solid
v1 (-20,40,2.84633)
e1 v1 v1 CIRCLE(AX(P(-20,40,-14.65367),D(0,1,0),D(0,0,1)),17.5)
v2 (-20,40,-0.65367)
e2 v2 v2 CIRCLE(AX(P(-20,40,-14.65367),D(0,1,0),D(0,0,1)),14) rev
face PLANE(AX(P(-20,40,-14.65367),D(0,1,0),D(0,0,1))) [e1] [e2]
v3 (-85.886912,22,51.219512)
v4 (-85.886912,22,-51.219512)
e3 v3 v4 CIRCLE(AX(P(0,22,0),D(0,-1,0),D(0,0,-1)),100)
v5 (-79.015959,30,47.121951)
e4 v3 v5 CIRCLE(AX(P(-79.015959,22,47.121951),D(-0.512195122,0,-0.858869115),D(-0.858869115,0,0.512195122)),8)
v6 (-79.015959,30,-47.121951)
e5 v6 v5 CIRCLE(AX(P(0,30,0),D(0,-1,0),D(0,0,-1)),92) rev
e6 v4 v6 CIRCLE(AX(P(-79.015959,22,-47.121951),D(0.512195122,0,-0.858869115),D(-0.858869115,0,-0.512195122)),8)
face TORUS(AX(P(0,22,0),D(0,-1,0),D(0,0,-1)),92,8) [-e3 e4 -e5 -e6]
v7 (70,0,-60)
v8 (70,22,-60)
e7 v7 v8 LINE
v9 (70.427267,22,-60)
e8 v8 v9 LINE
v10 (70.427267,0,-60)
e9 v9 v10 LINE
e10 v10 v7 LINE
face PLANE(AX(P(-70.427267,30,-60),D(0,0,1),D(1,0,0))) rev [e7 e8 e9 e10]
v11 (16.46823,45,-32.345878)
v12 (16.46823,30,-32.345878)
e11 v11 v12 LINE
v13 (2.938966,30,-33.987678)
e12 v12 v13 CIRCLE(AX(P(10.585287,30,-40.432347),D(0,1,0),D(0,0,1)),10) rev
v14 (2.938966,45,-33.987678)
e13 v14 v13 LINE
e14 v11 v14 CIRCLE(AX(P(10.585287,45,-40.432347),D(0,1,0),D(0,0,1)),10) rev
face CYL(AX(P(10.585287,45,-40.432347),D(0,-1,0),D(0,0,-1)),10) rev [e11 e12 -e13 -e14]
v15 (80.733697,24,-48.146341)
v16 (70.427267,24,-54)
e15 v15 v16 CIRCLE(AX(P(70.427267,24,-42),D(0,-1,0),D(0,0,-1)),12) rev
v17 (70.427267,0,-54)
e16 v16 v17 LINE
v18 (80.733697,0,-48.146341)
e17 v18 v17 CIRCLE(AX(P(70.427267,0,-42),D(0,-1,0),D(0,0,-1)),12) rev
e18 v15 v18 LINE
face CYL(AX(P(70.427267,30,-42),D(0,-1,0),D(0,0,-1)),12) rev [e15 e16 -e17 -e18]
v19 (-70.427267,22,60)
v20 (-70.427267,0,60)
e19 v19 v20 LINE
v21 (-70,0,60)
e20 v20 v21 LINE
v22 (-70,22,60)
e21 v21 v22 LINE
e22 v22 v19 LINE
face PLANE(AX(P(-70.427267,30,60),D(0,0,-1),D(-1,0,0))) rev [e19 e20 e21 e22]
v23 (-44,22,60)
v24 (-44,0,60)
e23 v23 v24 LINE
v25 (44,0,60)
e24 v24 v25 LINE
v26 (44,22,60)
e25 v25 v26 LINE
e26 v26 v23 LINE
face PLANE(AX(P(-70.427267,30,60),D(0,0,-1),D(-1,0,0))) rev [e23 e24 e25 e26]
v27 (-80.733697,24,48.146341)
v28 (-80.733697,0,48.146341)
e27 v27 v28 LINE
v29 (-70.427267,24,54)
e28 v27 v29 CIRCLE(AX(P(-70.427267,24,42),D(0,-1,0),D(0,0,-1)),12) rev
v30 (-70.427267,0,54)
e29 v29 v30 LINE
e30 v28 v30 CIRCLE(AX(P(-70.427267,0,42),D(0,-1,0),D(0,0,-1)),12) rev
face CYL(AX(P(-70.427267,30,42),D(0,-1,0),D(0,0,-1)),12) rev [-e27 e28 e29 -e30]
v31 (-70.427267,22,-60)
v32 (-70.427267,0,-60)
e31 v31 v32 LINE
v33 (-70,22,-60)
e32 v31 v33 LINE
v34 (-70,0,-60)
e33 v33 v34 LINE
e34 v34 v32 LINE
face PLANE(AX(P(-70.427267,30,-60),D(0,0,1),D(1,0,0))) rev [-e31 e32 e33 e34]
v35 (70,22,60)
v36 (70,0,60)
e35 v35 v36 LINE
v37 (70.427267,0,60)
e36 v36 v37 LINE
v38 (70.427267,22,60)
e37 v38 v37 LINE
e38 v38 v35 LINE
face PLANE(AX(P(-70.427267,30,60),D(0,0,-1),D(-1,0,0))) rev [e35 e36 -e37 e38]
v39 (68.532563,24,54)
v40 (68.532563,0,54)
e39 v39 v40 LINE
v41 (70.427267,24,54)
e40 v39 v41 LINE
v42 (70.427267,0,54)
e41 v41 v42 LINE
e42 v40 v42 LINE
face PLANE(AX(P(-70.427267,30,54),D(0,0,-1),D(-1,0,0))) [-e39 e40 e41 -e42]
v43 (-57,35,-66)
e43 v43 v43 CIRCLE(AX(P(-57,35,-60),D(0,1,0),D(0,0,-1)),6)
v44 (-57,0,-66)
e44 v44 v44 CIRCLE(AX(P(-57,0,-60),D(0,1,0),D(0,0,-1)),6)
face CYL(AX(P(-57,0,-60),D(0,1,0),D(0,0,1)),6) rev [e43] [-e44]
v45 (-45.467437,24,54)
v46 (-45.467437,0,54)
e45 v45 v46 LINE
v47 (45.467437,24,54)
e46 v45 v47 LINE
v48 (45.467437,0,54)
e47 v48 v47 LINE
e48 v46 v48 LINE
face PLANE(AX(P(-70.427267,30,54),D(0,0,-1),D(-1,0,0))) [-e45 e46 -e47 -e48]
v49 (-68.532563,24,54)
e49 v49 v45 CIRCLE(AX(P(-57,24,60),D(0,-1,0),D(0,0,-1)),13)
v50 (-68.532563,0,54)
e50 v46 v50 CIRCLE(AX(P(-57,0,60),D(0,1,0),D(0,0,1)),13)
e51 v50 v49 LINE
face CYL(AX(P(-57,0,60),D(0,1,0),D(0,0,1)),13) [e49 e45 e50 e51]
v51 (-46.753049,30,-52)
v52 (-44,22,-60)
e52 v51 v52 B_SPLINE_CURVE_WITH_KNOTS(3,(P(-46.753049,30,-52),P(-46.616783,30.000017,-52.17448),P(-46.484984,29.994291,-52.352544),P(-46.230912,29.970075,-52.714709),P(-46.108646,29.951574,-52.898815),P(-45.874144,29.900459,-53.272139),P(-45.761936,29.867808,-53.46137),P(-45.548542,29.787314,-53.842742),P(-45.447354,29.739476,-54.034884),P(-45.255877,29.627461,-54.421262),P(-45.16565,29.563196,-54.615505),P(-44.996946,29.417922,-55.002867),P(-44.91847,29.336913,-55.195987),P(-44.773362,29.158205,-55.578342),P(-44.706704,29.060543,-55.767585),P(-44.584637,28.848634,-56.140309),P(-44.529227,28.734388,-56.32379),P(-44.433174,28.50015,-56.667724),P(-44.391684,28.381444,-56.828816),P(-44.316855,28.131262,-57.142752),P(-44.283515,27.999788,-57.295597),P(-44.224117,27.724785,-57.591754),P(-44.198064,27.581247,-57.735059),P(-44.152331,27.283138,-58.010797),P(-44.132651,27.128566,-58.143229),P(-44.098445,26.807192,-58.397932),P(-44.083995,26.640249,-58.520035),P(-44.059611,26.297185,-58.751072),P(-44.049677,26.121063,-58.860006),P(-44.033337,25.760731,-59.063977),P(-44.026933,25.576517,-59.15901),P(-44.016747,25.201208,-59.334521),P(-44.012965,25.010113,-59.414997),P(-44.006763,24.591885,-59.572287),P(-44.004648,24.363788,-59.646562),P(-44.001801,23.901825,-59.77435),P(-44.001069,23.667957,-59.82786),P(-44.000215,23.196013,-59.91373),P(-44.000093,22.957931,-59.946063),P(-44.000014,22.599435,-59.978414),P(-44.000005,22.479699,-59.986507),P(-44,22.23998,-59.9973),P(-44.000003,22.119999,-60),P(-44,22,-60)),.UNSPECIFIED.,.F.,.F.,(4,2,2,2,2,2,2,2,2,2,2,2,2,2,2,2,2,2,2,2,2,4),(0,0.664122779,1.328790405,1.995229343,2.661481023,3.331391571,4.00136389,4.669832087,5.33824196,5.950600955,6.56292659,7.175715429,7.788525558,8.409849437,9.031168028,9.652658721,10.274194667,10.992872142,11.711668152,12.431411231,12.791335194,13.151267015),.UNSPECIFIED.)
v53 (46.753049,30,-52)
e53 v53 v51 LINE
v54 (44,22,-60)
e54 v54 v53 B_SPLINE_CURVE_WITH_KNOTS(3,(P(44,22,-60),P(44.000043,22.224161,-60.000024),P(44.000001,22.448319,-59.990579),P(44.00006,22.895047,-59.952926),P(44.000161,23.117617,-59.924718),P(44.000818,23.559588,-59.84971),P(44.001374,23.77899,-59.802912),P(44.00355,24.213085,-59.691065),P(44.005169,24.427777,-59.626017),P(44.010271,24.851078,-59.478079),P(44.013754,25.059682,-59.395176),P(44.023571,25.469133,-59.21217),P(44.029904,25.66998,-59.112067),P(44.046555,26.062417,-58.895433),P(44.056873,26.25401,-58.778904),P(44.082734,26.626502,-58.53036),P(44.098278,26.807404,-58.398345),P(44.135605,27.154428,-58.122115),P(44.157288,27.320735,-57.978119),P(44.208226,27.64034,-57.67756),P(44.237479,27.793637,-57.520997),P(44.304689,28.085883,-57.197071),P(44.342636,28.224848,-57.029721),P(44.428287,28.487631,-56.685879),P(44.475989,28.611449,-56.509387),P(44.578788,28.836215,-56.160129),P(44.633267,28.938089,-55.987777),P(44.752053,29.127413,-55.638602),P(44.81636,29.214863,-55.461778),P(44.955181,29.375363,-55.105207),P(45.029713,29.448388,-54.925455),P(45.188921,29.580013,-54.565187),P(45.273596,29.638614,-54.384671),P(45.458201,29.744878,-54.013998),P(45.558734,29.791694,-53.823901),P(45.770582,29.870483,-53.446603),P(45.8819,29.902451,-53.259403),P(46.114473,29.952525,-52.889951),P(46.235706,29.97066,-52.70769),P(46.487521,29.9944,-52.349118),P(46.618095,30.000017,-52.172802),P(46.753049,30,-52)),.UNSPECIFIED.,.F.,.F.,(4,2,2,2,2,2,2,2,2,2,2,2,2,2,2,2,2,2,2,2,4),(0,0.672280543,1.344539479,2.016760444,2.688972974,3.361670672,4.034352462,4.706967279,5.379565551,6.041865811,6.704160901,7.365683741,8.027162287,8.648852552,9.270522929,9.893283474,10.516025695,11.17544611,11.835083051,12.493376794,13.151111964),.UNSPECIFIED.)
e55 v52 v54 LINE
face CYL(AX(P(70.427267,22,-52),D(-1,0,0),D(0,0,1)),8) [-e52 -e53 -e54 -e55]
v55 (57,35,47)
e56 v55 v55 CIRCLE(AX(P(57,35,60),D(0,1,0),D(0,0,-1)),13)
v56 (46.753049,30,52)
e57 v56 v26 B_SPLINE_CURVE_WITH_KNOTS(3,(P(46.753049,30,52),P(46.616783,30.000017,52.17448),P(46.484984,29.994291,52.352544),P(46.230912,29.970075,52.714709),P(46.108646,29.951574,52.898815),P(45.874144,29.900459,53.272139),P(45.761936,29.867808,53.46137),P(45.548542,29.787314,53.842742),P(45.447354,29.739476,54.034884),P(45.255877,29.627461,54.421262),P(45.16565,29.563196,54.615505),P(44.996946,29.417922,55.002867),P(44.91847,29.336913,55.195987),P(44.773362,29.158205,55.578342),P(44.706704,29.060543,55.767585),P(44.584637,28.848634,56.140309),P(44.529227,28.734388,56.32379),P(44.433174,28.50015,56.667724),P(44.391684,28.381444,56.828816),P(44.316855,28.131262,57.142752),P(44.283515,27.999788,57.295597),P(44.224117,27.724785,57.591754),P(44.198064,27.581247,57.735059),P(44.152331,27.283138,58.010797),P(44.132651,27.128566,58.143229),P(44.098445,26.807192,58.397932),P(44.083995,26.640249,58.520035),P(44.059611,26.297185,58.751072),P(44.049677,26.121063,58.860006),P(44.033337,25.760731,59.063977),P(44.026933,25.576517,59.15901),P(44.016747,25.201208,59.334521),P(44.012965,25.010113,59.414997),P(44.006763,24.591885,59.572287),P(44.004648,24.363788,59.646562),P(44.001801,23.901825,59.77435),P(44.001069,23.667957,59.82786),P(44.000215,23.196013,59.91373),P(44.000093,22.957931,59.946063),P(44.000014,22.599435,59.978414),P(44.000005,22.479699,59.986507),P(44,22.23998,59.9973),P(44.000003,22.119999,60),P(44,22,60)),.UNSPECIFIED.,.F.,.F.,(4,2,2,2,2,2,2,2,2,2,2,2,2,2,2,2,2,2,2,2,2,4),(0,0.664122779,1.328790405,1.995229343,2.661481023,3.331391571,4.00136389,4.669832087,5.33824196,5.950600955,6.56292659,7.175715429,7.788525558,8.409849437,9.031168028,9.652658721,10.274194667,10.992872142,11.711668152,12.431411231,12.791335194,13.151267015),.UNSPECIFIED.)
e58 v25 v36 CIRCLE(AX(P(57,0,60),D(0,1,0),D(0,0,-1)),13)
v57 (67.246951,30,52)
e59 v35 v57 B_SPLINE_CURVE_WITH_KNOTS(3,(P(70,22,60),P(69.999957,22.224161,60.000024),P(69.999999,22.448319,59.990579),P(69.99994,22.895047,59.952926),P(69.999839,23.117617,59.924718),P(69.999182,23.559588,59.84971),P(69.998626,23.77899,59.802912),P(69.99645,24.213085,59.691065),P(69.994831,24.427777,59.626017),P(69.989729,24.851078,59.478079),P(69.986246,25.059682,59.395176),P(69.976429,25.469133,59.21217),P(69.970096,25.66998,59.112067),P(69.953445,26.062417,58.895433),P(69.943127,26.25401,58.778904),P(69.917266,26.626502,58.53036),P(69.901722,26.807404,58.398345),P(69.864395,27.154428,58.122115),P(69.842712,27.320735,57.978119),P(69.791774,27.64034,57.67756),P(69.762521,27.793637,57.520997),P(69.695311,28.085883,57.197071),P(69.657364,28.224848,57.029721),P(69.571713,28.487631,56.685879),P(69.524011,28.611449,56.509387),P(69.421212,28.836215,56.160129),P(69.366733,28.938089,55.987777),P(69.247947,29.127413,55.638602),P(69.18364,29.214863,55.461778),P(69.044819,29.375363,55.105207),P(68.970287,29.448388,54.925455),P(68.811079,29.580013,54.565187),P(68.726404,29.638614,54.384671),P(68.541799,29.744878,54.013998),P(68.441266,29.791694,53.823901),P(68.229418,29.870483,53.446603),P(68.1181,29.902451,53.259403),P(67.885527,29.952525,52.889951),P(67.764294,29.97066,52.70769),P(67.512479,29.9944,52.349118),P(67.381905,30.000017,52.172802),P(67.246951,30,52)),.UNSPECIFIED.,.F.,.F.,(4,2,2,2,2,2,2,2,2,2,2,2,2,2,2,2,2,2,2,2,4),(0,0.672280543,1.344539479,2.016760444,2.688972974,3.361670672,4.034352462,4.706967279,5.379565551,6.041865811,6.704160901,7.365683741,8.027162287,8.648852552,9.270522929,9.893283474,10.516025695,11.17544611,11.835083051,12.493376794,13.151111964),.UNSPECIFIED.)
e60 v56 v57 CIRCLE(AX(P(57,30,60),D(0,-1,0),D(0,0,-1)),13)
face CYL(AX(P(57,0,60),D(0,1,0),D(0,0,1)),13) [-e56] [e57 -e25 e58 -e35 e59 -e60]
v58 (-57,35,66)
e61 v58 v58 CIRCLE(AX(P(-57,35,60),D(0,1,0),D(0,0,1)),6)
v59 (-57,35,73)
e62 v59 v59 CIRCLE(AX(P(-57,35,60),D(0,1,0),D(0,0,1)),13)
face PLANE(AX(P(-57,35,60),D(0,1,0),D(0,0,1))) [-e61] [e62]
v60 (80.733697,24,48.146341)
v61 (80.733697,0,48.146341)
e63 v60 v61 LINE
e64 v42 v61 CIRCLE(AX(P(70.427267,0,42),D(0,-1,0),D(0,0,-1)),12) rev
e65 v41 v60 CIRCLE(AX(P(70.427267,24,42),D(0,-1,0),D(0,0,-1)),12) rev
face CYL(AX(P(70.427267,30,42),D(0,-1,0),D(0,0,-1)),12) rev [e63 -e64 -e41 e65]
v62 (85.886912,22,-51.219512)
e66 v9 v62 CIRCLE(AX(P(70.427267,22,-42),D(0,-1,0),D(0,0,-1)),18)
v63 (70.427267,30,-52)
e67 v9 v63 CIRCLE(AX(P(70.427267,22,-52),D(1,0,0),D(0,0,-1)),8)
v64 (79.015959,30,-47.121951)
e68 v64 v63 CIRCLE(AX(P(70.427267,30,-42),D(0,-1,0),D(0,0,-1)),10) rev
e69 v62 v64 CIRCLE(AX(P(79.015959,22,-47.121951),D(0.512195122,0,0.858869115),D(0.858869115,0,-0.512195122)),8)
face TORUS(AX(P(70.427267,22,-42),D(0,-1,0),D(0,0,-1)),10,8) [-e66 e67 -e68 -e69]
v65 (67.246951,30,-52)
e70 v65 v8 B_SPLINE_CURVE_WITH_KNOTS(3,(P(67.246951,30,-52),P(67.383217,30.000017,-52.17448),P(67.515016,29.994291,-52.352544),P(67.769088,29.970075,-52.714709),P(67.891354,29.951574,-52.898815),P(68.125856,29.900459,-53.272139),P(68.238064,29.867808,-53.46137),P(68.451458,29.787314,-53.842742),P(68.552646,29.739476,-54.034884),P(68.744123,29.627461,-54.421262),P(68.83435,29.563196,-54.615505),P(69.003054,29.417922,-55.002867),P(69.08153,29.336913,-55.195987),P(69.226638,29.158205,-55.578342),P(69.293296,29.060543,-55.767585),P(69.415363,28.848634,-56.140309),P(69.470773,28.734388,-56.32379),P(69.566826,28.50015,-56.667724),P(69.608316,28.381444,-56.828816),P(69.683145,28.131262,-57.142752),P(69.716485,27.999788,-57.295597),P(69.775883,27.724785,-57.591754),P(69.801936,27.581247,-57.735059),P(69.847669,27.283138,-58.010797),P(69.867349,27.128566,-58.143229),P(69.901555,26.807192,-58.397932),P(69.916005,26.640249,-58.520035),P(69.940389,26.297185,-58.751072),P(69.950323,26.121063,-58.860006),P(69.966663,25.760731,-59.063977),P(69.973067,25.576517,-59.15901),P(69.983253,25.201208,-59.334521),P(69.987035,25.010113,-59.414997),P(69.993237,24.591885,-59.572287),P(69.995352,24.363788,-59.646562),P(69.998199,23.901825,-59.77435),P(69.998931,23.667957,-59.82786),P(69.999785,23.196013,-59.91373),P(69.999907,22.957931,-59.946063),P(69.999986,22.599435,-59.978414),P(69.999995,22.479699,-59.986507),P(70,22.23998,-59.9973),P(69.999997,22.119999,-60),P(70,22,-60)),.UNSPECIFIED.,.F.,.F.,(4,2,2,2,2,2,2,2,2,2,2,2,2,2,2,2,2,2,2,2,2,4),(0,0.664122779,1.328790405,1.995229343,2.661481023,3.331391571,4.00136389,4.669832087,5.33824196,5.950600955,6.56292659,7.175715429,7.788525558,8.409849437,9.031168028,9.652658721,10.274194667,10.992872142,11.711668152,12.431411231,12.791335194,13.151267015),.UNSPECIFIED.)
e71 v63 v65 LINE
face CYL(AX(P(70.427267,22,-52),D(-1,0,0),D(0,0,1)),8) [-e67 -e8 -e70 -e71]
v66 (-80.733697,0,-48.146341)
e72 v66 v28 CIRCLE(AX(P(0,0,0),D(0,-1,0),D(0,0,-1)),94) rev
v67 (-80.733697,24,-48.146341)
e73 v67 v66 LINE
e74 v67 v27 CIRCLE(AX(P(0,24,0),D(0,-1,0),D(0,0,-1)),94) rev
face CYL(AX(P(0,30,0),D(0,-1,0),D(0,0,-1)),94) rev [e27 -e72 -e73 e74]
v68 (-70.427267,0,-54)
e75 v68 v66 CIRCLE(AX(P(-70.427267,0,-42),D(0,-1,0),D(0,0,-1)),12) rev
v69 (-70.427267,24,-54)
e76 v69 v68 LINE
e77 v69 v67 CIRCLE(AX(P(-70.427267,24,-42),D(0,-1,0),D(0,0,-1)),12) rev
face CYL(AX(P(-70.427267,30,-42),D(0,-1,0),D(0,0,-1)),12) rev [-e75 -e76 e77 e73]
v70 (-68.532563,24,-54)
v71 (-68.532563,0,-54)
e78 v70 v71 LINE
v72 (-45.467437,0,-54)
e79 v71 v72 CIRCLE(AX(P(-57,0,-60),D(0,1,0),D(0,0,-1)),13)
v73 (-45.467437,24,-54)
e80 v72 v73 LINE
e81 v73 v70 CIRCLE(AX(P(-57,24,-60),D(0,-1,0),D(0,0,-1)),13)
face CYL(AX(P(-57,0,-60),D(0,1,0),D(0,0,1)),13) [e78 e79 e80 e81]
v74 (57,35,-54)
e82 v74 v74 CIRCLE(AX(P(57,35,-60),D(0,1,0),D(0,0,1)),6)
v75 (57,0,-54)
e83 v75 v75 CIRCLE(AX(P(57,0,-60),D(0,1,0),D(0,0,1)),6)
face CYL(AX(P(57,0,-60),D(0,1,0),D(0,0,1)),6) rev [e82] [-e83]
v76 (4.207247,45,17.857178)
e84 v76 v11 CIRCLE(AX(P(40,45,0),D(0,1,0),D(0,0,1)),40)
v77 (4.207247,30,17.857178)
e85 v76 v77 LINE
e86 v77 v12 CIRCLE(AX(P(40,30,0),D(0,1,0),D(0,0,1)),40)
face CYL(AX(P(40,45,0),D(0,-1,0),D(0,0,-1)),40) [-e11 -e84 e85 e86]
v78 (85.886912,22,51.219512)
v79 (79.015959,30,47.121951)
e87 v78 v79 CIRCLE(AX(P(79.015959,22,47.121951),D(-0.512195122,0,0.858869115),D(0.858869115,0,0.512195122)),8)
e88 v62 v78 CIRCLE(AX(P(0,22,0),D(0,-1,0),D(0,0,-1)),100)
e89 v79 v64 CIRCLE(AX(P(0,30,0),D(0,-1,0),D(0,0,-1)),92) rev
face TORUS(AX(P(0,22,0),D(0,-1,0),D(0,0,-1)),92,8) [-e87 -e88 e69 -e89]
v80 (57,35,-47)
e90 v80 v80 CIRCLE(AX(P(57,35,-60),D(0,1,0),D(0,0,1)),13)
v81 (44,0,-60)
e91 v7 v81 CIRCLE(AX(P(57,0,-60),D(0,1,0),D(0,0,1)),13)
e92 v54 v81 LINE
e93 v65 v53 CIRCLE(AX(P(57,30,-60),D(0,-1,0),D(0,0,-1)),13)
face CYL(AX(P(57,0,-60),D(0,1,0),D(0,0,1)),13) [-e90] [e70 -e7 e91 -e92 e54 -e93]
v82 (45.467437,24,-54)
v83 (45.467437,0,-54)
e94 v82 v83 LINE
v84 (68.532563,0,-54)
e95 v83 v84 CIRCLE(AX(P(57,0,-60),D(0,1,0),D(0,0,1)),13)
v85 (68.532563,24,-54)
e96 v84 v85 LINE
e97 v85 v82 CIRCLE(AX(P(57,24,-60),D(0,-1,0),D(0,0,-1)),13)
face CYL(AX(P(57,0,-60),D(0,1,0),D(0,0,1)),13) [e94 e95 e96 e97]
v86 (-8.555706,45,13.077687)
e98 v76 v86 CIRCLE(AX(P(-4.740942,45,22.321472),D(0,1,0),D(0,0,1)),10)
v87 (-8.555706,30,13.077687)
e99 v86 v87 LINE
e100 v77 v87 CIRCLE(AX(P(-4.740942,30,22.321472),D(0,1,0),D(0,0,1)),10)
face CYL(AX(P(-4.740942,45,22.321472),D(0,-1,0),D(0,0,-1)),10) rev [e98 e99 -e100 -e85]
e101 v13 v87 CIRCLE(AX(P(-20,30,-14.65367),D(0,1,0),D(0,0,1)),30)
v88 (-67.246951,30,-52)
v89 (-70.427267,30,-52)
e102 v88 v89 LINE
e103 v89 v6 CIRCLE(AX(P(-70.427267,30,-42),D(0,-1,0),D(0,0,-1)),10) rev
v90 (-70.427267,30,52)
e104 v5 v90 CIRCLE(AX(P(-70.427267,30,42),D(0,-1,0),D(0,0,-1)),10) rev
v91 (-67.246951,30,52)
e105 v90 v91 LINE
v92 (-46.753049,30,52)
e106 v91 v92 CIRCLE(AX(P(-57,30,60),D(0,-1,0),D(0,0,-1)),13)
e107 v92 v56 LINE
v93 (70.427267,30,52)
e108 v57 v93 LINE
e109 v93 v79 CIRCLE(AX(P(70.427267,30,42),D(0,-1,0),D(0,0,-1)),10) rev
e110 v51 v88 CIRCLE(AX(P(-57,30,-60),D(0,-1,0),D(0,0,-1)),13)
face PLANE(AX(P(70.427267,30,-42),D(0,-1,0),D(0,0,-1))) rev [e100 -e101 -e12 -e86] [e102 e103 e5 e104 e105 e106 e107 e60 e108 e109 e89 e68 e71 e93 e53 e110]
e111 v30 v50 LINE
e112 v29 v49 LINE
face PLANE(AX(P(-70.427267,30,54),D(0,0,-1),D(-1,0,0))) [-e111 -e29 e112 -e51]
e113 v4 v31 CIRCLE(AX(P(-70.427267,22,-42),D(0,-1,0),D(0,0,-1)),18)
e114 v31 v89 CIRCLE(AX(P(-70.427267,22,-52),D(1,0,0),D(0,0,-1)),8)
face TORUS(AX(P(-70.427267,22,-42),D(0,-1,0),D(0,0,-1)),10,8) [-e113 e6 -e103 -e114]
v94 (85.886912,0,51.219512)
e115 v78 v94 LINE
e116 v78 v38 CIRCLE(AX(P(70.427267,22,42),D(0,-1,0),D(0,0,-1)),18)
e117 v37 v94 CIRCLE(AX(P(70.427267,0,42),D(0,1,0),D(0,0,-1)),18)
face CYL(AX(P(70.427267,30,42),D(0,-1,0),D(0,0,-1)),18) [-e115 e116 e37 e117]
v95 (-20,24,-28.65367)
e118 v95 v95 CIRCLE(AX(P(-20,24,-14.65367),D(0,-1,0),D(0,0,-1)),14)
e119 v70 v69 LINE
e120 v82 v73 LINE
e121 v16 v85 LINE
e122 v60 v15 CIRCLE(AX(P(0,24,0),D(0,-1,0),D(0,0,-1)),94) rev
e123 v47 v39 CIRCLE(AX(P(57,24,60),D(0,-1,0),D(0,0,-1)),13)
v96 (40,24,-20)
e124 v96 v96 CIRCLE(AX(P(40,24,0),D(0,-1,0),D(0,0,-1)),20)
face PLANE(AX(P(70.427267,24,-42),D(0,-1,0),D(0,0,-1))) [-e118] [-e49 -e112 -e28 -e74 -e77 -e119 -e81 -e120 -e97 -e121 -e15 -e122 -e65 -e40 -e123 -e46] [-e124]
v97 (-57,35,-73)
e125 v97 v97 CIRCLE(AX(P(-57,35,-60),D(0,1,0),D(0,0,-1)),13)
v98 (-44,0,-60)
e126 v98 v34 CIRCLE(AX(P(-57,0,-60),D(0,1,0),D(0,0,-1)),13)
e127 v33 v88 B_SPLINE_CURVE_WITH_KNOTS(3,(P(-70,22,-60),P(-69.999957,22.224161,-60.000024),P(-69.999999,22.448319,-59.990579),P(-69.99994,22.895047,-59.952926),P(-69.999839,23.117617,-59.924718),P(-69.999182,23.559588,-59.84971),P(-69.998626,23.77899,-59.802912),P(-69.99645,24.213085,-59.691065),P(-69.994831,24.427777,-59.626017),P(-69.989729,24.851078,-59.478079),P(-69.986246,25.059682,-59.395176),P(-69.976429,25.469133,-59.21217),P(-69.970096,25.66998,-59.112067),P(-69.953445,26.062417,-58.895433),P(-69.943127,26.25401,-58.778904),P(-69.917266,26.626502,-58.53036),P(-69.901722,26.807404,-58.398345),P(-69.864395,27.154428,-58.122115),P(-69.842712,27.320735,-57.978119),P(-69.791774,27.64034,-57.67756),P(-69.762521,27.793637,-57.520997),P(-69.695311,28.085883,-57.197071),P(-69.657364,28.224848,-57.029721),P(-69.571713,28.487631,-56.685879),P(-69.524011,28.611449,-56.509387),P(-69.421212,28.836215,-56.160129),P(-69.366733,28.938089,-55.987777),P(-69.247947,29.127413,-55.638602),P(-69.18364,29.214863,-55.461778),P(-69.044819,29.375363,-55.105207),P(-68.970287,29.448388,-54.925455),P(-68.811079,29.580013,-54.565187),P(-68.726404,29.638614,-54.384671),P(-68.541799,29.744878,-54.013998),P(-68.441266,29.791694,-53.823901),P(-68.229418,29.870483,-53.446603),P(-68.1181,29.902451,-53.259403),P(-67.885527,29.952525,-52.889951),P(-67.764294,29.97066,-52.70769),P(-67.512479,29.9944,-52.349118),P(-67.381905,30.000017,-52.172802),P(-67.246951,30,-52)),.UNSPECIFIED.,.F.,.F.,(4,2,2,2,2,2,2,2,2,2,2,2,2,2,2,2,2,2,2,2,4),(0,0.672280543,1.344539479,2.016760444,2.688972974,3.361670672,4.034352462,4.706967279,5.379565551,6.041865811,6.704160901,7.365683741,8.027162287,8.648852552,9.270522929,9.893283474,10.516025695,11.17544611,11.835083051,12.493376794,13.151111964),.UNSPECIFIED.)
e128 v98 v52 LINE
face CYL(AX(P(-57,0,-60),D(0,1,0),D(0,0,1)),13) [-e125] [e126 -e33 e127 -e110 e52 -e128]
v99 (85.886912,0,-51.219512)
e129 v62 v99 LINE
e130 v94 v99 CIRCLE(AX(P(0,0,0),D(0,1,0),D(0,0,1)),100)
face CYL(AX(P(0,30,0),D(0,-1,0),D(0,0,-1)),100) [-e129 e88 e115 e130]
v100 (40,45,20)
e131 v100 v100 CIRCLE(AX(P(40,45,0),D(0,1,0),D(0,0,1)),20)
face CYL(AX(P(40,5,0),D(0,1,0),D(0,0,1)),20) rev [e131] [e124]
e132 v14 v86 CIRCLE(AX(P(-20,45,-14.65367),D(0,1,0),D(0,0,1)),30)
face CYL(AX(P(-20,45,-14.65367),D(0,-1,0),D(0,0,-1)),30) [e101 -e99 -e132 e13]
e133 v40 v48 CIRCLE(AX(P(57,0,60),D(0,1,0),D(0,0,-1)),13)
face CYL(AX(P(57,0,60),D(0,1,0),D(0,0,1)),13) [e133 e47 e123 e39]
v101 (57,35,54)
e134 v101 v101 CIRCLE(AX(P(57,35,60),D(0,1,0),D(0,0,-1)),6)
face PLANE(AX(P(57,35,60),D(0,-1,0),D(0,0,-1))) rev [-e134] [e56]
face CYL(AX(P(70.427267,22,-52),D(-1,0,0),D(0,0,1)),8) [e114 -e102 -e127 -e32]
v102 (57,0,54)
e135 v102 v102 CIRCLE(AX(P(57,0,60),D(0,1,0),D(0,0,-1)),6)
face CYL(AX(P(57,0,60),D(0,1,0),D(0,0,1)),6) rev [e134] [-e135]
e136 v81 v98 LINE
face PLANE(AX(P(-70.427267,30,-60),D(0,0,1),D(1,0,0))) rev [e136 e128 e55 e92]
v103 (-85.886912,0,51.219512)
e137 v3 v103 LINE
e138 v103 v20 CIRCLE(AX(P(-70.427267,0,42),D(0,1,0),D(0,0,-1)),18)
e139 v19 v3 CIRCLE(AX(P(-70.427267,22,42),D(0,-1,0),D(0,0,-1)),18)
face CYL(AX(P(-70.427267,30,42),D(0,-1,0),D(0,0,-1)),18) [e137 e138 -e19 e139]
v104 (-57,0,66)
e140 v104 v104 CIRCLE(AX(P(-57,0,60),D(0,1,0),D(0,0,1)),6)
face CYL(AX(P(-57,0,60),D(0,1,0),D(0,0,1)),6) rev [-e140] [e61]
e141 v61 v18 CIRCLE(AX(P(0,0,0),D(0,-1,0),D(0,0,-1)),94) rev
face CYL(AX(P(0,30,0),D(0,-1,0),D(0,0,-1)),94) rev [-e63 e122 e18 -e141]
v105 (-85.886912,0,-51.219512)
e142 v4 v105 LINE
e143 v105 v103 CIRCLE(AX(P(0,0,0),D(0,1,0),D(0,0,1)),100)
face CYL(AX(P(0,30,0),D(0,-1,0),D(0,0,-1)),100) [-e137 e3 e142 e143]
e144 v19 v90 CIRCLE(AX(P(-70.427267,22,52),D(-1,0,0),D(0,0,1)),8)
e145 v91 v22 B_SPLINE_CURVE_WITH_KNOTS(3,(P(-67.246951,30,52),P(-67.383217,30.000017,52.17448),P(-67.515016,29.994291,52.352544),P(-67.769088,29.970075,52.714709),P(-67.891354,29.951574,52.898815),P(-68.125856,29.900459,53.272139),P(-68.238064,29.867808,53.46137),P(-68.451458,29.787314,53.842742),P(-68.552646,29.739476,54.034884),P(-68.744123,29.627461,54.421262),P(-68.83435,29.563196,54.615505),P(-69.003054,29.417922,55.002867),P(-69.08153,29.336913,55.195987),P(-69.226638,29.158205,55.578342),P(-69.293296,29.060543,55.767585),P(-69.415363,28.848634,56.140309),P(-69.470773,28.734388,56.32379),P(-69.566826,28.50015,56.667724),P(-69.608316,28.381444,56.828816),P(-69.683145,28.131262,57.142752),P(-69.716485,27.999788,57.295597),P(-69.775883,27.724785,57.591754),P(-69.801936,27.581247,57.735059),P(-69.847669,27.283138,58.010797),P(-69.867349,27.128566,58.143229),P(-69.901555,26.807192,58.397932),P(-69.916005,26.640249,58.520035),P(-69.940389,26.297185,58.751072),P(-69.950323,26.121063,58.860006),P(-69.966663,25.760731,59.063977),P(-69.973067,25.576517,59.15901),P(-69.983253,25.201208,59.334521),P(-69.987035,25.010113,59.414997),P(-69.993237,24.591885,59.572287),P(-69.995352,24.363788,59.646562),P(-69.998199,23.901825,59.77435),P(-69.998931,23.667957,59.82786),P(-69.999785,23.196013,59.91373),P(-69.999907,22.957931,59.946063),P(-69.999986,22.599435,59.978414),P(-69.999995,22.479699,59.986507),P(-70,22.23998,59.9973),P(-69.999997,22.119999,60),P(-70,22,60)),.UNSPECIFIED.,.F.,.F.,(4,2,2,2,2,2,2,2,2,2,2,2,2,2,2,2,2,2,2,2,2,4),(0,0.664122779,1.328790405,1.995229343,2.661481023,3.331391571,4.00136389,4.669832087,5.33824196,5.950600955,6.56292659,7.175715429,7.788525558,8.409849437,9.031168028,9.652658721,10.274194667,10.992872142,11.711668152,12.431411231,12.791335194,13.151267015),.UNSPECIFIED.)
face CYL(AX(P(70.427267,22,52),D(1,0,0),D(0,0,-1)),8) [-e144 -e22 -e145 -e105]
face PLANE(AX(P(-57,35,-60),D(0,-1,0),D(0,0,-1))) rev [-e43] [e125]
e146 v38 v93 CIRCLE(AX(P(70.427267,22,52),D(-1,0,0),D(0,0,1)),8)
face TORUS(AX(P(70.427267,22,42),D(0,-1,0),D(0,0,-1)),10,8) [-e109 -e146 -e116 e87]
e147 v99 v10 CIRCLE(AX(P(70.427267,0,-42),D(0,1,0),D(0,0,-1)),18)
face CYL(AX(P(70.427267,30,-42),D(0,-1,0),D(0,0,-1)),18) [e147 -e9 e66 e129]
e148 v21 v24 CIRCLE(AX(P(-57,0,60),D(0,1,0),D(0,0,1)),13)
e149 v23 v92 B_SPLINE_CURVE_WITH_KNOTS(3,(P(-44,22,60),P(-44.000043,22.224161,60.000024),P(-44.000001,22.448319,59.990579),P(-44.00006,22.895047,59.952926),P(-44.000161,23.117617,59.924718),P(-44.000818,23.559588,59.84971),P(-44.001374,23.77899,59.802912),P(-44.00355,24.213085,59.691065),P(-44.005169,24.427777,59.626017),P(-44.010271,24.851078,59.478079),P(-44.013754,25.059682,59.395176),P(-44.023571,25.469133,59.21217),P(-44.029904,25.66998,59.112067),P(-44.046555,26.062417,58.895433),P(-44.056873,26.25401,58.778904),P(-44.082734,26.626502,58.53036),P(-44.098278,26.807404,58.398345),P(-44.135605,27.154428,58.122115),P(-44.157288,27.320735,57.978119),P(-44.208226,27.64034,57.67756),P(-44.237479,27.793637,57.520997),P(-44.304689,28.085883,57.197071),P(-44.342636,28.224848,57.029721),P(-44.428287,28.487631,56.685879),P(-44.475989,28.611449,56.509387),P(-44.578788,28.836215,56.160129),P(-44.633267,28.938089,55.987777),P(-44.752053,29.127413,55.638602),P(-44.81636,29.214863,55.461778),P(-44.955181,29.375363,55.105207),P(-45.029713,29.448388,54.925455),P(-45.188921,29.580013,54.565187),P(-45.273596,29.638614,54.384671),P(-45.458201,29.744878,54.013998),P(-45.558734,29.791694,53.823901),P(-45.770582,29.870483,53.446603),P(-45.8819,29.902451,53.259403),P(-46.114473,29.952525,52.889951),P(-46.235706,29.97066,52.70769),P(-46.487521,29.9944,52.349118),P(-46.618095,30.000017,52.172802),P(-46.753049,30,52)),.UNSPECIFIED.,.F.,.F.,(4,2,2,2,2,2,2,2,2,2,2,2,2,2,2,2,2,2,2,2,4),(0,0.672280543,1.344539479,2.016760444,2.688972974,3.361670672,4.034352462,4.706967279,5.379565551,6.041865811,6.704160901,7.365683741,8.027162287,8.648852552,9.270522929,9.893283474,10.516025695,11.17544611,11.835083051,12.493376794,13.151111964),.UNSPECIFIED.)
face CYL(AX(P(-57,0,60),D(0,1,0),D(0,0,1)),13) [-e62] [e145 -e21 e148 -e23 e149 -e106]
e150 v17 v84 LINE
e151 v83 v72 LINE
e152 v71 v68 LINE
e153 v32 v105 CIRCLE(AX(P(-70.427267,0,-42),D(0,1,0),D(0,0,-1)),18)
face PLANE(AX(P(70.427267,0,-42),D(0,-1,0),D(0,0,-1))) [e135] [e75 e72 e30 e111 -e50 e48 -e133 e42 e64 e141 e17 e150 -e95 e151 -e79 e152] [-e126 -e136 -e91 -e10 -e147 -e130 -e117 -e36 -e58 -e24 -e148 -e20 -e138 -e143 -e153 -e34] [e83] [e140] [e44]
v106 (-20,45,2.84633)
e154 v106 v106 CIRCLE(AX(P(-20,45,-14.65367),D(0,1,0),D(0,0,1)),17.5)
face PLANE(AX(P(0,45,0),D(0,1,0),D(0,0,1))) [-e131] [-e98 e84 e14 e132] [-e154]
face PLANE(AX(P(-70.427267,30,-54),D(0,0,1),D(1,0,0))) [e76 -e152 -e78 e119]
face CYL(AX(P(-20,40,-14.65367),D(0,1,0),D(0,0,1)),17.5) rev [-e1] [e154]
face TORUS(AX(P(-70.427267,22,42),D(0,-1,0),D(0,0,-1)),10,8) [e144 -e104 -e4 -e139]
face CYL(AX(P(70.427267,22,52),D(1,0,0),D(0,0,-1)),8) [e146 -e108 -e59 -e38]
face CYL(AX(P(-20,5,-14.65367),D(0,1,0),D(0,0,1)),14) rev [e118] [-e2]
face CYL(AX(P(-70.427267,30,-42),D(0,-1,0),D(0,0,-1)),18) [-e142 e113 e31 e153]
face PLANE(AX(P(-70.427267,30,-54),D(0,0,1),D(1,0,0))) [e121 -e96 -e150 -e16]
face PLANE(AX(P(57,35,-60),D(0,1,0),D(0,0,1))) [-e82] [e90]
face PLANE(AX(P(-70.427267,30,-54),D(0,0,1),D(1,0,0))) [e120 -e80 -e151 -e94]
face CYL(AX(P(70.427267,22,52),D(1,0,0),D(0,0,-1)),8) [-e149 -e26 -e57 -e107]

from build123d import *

# Parameters (mm, degrees)
BOSS_EXTRUDE1_DEPTH      = 30
SHELL1_T                 = -6
BOSS_EXTRUDE3_DEPTH      = 5
BOSS_EXTRUDE3_DEPTH_BACK = 30
SKETCH2_R                = 13
SKETCH2_R_2              = 6
SKETCH5_R                = 6
CUT_EXTRUDE1_DEPTH       = 35
FILLET1_R                = 8
BOSS_EXTRUDE4_DEPTH      = 15
SKETCH7_R                = 20
SKETCH7_R_2              = 14
CUT_EXTRUDE3_DEPTH       = 40
SKETCH8_R                = 17.5
CUT_EXTRUDE4_DEPTH       = 5


with BuildPart() as part:
    # Sketch1 → Boss-Extrude1 (new body)
    with BuildSketch(Plane(origin=(0, 0, 0), x_dir=(1, 0, 0), z_dir=(0, 1, 0))):
        with BuildLine():
            Line((-70.427267447, 60), (70.427267447, 60))
            ThreePointArc((70.427267447, 60), (79.316833816, 57.651696705), (85.88691152, 51.219512195))
            ThreePointArc((85.88691152, 51.219512195), (100, 0), (85.88691152, -51.219512195))
            ThreePointArc((85.88691152, -51.219512195), (79.316833816, -57.651696705), (70.427267447, -60))
            Line((70.427267447, -60), (-70.427267447, -60))
            ThreePointArc((-70.427267447, -60), (-79.316833816, -57.651696705), (-85.88691152, -51.219512195))
            ThreePointArc((-85.88691152, -51.219512195), (-100, 0), (-85.88691152, 51.219512195))
            ThreePointArc((-85.88691152, 51.219512195), (-79.316833816, 57.651696705), (-70.427267447, 60))
        make_face()
    extrude(amount=BOSS_EXTRUDE1_DEPTH)

    # Shell1
    shell1_openings = [part.faces().sort_by_distance(p)[0] for p in [
        (0, 0, 0),
    ]]
    offset(amount=SHELL1_T, openings=shell1_openings, kind=Kind.INTERSECTION)

    # Sketch2 → Boss-Extrude3 (add, two sides: drawn at the far end of the back side and taken through both)
    # profile 1 of 4: a face of its own
    with BuildSketch(Plane(origin=(0, 30, 0), x_dir=(1, 0, 0), z_dir=(0, 1, 0)).offset(-BOSS_EXTRUDE3_DEPTH_BACK)):
        with Locations(Location((57, 60, 0), (0, 0, 270))):
            Circle(SKETCH2_R)
        with Locations(Location((57, 60, 0), (0, 0, 270))):
            Circle(SKETCH2_R_2, mode=Mode.SUBTRACT)
    # profile 2 of 4: a face of its own
    with BuildSketch(Plane(origin=(0, 30, 0), x_dir=(1, 0, 0), z_dir=(0, 1, 0)).offset(-BOSS_EXTRUDE3_DEPTH_BACK)):
        with Locations((-57, 60)):
            Circle(SKETCH2_R)
        with Locations(Location((-57, 60, 0), (0, 0, 180))):
            Circle(SKETCH2_R_2, mode=Mode.SUBTRACT)
    # profile 3 of 4: a face of its own
    with BuildSketch(Plane(origin=(0, 30, 0), x_dir=(1, 0, 0), z_dir=(0, 1, 0)).offset(-BOSS_EXTRUDE3_DEPTH_BACK)):
        with Locations(Location((-57, -60, 0), (0, 0, 270))):
            Circle(SKETCH2_R)
        with Locations(Location((-57, -60, 0), (0, 0, 270))):
            Circle(SKETCH2_R_2, mode=Mode.SUBTRACT)
    # profile 4 of 4: a face of its own
    with BuildSketch(Plane(origin=(0, 30, 0), x_dir=(1, 0, 0), z_dir=(0, 1, 0)).offset(-BOSS_EXTRUDE3_DEPTH_BACK)):
        with Locations(Location((57, -60, 0), (0, 0, 180))):
            Circle(SKETCH2_R)
        with Locations((57, -60)):
            Circle(SKETCH2_R_2, mode=Mode.SUBTRACT)
    extrude(amount=BOSS_EXTRUDE3_DEPTH + BOSS_EXTRUDE3_DEPTH_BACK)

    # Sketch5 → Cut-Extrude1 (cut)
    with BuildSketch(Plane(origin=(0, 35, 0), x_dir=(1, 0, 0), z_dir=(0, 1, 0))):
        with Locations(Location((-57, 60, 0), (0, 0, 90))):
            Circle(SKETCH5_R)
        with Locations(Location((-57, -60, 0), (0, 0, 270))):
            Circle(SKETCH5_R)
        with Locations(Location((57, -60, 0), (0, 0, 90))):
            Circle(SKETCH5_R)
        with Locations(Location((57, 60, 0), (0, 0, 270))):
            Circle(SKETCH5_R)
    extrude(amount=-CUT_EXTRUDE1_DEPTH, mode=Mode.SUBTRACT)

    # Fillet1
    # the kernel refuses this fillet: 8 mm, written as the material it takes off along each edge
    with BuildSketch(Plane(origin=(-70.427267447, 30, -42), x_dir=(-0.858869115202879, 0, -0.5121951219512186), z_dir=(-0.5121951219512186, 0, 0.858869115202879))) as fillet1_piece_1:
        with BuildLine():
            CenterArc((18 - FILLET1_R, FILLET1_R), FILLET1_R, 270, 90)
            Line((18 - FILLET1_R, 0), (18, 0))
            Line((18, 0), (18, FILLET1_R))
        make_face()
    revolve(axis=Axis((-70.427267447, 30, -42), (0, -1, 0)), revolution_arc=59.189843357, mode=Mode.SUBTRACT)
    with BuildSketch(Plane(origin=(70.427267447, 30, 60), x_dir=(0, 0, -1), z_dir=(-1, 0, 0))) as fillet1_piece_2_section:
        with BuildLine():
            CenterArc((FILLET1_R, FILLET1_R), FILLET1_R, 180, 90)
            Line((0, FILLET1_R), (0, 0))
            Line((0, 0), (FILLET1_R, 0))
        make_face()
    fillet1_piece_2 = extrude(amount=20.427267447, mode=Mode.PRIVATE)
    fillet1_piece_2 = fillet1_piece_2 - Plane(origin=(57, 28.58355389, 60), x_dir=(-1, 0, 0), z_dir=(0, 1, 0)) * Cylinder(13, 73, mode=Mode.PRIVATE)
    add(fillet1_piece_2, mode=Mode.SUBTRACT)
    with BuildSketch(Plane(origin=(0, 30, 0), x_dir=(-0.8588691152028786, 0, 0.5121951219512192), z_dir=(0.5121951219512192, 0, 0.8588691152028786))) as fillet1_piece_3:
        with BuildLine():
            CenterArc((100 - FILLET1_R, FILLET1_R), FILLET1_R, 270, 90)
            Line((100 - FILLET1_R, 0), (100, 0))
            Line((100, 0), (100, FILLET1_R))
        make_face()
    revolve(axis=Axis((0, 30, 0), (0, -1, 0)), revolution_arc=61.620313286, mode=Mode.SUBTRACT)
    with BuildSketch(Plane(origin=(-70.427267447, 30, 42), x_dir=(0, 0, 1), z_dir=(1, 0, 0))) as fillet1_piece_4:
        with BuildLine():
            CenterArc((18 - FILLET1_R, FILLET1_R), FILLET1_R, 270, 90)
            Line((18 - FILLET1_R, 0), (18, 0))
            Line((18, 0), (18, FILLET1_R))
        make_face()
    revolve(axis=Axis((-70.427267447, 30, 42), (0, -1, 0)), revolution_arc=59.189843357, mode=Mode.SUBTRACT)
    with BuildSketch(Plane(origin=(-50, 30, 60), x_dir=(0, 0, -1), z_dir=(-1, 0, 0))) as fillet1_piece_5_section:
        with BuildLine():
            CenterArc((FILLET1_R, FILLET1_R), FILLET1_R, 180, 90)
            Line((0, FILLET1_R), (0, 0))
            Line((0, 0), (FILLET1_R, 0))
        make_face()
    fillet1_piece_5 = extrude(amount=20.427267447, mode=Mode.PRIVATE)
    fillet1_piece_5 = fillet1_piece_5 - Plane(origin=(-57, 28.583553668, 60), x_dir=(0, 0, 1), z_dir=(0, 1, 0)) * Cylinder(13, 73, mode=Mode.PRIVATE)
    add(fillet1_piece_5, mode=Mode.SUBTRACT)
    with BuildSketch(Plane(origin=(70.427267447, 30, 42), x_dir=(0.8588691152028791, 0, 0.5121951219512185), z_dir=(0.5121951219512185, 0, -0.8588691152028791))) as fillet1_piece_6:
        with BuildLine():
            CenterArc((18 - FILLET1_R, FILLET1_R), FILLET1_R, 270, 90)
            Line((18, FILLET1_R), (18, 0))
            Line((18, 0), (18 - FILLET1_R, 0))
        make_face()
    revolve(axis=Axis((70.427267447, 30, 42), (0, -1, 0)), revolution_arc=59.189843357, mode=Mode.SUBTRACT)
    with BuildSketch(Plane(origin=(0, 30, 0), x_dir=(0.8588691152028793, 0, -0.5121951219512181), z_dir=(-0.5121951219512181, 0, -0.8588691152028793))) as fillet1_piece_7:
        with BuildLine():
            CenterArc((100 - FILLET1_R, FILLET1_R), FILLET1_R, 270, 90)
            Line((100, FILLET1_R), (100, 0))
            Line((100, 0), (100 - FILLET1_R, 0))
        make_face()
    revolve(axis=Axis((0, 30, 0), (0, -1, 0)), revolution_arc=61.620313286, mode=Mode.SUBTRACT)
    with BuildSketch(Plane(origin=(70.427267447, 30, -42), x_dir=(0, 0, -1), z_dir=(-1, 0, 0))) as fillet1_piece_8:
        with BuildLine():
            CenterArc((18 - FILLET1_R, FILLET1_R), FILLET1_R, 270, 90)
            Line((18, FILLET1_R), (18, 0))
            Line((18, 0), (18 - FILLET1_R, 0))
        make_face()
    revolve(axis=Axis((70.427267447, 30, -42), (0, -1, 0)), revolution_arc=59.189843357, mode=Mode.SUBTRACT)
    with BuildSketch(Plane(origin=(-64, 30, -60), x_dir=(0, 0, 1), z_dir=(1, 0, 0))) as fillet1_piece_9_section:
        with BuildLine():
            CenterArc((FILLET1_R, FILLET1_R), FILLET1_R, 180, 90)
            Line((0, FILLET1_R), (0, 0))
            Line((0, 0), (FILLET1_R, 0))
        make_face()
    fillet1_piece_9 = extrude(amount=128, mode=Mode.PRIVATE)
    fillet1_piece_9 = fillet1_piece_9 - Plane(origin=(-57, 28.21841699, -60), x_dir=(1, 0, 0), z_dir=(0, 1, 0)) * Cylinder(13, 288, mode=Mode.PRIVATE)
    fillet1_piece_9 = fillet1_piece_9 - Plane(origin=(57, 28.21841699, -60), x_dir=(0, 0, 1), z_dir=(0, 1, 0)) * Cylinder(13, 288, mode=Mode.PRIVATE)
    add(fillet1_piece_9, mode=Mode.SUBTRACT)
    with BuildSketch(Plane(origin=(-70.427267447, 30, -60), x_dir=(0, 0, 1), z_dir=(1, 0, 0))) as fillet1_piece_10_section:
        with BuildLine():
            CenterArc((FILLET1_R, FILLET1_R), FILLET1_R, 180, 90)
            Line((0, FILLET1_R), (0, 0))
            Line((0, 0), (FILLET1_R, 0))
        make_face()
    fillet1_piece_10 = extrude(amount=20.427267447, mode=Mode.PRIVATE)
    fillet1_piece_10 = fillet1_piece_10 - Plane(origin=(-57, 28.583553949, -60), x_dir=(1, 0, 0), z_dir=(0, 1, 0)) * Cylinder(13, 73, mode=Mode.PRIVATE)
    add(fillet1_piece_10, mode=Mode.SUBTRACT)
    with BuildSketch(Plane(origin=(50, 30, -60), x_dir=(0, 0, 1), z_dir=(1, 0, 0))) as fillet1_piece_11_section:
        with BuildLine():
            CenterArc((FILLET1_R, FILLET1_R), FILLET1_R, 180, 90)
            Line((0, FILLET1_R), (0, 0))
            Line((0, 0), (FILLET1_R, 0))
        make_face()
    fillet1_piece_11 = extrude(amount=20.427267447, mode=Mode.PRIVATE)
    fillet1_piece_11 = fillet1_piece_11 - Plane(origin=(57, 28.583553668, -60), x_dir=(0, 0, 1), z_dir=(0, 1, 0)) * Cylinder(13, 73, mode=Mode.PRIVATE)
    add(fillet1_piece_11, mode=Mode.SUBTRACT)
    with BuildSketch(Plane(origin=(64, 30, 60), x_dir=(0, 0, -1), z_dir=(-1, 0, 0))) as fillet1_piece_12_section:
        with BuildLine():
            CenterArc((FILLET1_R, FILLET1_R), FILLET1_R, 180, 90)
            Line((0, FILLET1_R), (0, 0))
            Line((0, 0), (FILLET1_R, 0))
        make_face()
    fillet1_piece_12 = extrude(amount=128, mode=Mode.PRIVATE)
    fillet1_piece_12 = fillet1_piece_12 - Plane(origin=(-57, 28.21841699, 60), x_dir=(0, 0, 1), z_dir=(0, 1, 0)) * Cylinder(13, 288, mode=Mode.PRIVATE)
    fillet1_piece_12 = fillet1_piece_12 - Plane(origin=(57, 28.21841699, 60), x_dir=(-1, 0, 0), z_dir=(0, 1, 0)) * Cylinder(13, 288, mode=Mode.PRIVATE)
    add(fillet1_piece_12, mode=Mode.SUBTRACT)

    # Sketch6 → Boss-Extrude4 (add)
    with BuildSketch(Plane(origin=(0, 30, 0), x_dir=(1, 0, 0), z_dir=(0, 1, 0))):
        with BuildLine():
            ThreePointArc((4.207246611, -17.857177964), (78.857900978, -9.4901808), (16.468229876, 32.345877555))
            ThreePointArc((16.468229876, 32.345877555), (9.380607501, 30.505174816), (2.938965509, 33.987677645))
            ThreePointArc((2.938965509, 33.987677645), (-49.143425733, 21.771305347), (-8.555706302, -13.077686905))
            ThreePointArc((-8.555706302, -13.077686905), (-1.233963888, -12.95658557), (4.207246611, -17.857177964))
        make_face()
    extrude(amount=BOSS_EXTRUDE4_DEPTH)

    # Sketch7 → Cut-Extrude3 (cut)
    with BuildSketch(Plane(origin=(0, 45, 0), x_dir=(1, 0, 0), z_dir=(0, 1, 0))):
        with Locations(Location((40, 0, 0), (0, 0, 270))):
            Circle(SKETCH7_R)
        with Locations(Location((-20, 14.653669747, 0), (0, 0, 270))):
            Circle(SKETCH7_R_2)
    extrude(amount=-CUT_EXTRUDE3_DEPTH, mode=Mode.SUBTRACT)

    # Sketch8 → Cut-Extrude4 (cut)
    with BuildSketch(Plane(origin=(0, 45, 0), x_dir=(1, 0, 0), z_dir=(0, 1, 0))):
        with Locations(Location((-20, 14.653669747, 0), (0, 0, 270))):
            Circle(SKETCH8_R)
    extrude(amount=-CUT_EXTRUDE4_DEPTH, mode=Mode.SUBTRACT)


solid = part.part
